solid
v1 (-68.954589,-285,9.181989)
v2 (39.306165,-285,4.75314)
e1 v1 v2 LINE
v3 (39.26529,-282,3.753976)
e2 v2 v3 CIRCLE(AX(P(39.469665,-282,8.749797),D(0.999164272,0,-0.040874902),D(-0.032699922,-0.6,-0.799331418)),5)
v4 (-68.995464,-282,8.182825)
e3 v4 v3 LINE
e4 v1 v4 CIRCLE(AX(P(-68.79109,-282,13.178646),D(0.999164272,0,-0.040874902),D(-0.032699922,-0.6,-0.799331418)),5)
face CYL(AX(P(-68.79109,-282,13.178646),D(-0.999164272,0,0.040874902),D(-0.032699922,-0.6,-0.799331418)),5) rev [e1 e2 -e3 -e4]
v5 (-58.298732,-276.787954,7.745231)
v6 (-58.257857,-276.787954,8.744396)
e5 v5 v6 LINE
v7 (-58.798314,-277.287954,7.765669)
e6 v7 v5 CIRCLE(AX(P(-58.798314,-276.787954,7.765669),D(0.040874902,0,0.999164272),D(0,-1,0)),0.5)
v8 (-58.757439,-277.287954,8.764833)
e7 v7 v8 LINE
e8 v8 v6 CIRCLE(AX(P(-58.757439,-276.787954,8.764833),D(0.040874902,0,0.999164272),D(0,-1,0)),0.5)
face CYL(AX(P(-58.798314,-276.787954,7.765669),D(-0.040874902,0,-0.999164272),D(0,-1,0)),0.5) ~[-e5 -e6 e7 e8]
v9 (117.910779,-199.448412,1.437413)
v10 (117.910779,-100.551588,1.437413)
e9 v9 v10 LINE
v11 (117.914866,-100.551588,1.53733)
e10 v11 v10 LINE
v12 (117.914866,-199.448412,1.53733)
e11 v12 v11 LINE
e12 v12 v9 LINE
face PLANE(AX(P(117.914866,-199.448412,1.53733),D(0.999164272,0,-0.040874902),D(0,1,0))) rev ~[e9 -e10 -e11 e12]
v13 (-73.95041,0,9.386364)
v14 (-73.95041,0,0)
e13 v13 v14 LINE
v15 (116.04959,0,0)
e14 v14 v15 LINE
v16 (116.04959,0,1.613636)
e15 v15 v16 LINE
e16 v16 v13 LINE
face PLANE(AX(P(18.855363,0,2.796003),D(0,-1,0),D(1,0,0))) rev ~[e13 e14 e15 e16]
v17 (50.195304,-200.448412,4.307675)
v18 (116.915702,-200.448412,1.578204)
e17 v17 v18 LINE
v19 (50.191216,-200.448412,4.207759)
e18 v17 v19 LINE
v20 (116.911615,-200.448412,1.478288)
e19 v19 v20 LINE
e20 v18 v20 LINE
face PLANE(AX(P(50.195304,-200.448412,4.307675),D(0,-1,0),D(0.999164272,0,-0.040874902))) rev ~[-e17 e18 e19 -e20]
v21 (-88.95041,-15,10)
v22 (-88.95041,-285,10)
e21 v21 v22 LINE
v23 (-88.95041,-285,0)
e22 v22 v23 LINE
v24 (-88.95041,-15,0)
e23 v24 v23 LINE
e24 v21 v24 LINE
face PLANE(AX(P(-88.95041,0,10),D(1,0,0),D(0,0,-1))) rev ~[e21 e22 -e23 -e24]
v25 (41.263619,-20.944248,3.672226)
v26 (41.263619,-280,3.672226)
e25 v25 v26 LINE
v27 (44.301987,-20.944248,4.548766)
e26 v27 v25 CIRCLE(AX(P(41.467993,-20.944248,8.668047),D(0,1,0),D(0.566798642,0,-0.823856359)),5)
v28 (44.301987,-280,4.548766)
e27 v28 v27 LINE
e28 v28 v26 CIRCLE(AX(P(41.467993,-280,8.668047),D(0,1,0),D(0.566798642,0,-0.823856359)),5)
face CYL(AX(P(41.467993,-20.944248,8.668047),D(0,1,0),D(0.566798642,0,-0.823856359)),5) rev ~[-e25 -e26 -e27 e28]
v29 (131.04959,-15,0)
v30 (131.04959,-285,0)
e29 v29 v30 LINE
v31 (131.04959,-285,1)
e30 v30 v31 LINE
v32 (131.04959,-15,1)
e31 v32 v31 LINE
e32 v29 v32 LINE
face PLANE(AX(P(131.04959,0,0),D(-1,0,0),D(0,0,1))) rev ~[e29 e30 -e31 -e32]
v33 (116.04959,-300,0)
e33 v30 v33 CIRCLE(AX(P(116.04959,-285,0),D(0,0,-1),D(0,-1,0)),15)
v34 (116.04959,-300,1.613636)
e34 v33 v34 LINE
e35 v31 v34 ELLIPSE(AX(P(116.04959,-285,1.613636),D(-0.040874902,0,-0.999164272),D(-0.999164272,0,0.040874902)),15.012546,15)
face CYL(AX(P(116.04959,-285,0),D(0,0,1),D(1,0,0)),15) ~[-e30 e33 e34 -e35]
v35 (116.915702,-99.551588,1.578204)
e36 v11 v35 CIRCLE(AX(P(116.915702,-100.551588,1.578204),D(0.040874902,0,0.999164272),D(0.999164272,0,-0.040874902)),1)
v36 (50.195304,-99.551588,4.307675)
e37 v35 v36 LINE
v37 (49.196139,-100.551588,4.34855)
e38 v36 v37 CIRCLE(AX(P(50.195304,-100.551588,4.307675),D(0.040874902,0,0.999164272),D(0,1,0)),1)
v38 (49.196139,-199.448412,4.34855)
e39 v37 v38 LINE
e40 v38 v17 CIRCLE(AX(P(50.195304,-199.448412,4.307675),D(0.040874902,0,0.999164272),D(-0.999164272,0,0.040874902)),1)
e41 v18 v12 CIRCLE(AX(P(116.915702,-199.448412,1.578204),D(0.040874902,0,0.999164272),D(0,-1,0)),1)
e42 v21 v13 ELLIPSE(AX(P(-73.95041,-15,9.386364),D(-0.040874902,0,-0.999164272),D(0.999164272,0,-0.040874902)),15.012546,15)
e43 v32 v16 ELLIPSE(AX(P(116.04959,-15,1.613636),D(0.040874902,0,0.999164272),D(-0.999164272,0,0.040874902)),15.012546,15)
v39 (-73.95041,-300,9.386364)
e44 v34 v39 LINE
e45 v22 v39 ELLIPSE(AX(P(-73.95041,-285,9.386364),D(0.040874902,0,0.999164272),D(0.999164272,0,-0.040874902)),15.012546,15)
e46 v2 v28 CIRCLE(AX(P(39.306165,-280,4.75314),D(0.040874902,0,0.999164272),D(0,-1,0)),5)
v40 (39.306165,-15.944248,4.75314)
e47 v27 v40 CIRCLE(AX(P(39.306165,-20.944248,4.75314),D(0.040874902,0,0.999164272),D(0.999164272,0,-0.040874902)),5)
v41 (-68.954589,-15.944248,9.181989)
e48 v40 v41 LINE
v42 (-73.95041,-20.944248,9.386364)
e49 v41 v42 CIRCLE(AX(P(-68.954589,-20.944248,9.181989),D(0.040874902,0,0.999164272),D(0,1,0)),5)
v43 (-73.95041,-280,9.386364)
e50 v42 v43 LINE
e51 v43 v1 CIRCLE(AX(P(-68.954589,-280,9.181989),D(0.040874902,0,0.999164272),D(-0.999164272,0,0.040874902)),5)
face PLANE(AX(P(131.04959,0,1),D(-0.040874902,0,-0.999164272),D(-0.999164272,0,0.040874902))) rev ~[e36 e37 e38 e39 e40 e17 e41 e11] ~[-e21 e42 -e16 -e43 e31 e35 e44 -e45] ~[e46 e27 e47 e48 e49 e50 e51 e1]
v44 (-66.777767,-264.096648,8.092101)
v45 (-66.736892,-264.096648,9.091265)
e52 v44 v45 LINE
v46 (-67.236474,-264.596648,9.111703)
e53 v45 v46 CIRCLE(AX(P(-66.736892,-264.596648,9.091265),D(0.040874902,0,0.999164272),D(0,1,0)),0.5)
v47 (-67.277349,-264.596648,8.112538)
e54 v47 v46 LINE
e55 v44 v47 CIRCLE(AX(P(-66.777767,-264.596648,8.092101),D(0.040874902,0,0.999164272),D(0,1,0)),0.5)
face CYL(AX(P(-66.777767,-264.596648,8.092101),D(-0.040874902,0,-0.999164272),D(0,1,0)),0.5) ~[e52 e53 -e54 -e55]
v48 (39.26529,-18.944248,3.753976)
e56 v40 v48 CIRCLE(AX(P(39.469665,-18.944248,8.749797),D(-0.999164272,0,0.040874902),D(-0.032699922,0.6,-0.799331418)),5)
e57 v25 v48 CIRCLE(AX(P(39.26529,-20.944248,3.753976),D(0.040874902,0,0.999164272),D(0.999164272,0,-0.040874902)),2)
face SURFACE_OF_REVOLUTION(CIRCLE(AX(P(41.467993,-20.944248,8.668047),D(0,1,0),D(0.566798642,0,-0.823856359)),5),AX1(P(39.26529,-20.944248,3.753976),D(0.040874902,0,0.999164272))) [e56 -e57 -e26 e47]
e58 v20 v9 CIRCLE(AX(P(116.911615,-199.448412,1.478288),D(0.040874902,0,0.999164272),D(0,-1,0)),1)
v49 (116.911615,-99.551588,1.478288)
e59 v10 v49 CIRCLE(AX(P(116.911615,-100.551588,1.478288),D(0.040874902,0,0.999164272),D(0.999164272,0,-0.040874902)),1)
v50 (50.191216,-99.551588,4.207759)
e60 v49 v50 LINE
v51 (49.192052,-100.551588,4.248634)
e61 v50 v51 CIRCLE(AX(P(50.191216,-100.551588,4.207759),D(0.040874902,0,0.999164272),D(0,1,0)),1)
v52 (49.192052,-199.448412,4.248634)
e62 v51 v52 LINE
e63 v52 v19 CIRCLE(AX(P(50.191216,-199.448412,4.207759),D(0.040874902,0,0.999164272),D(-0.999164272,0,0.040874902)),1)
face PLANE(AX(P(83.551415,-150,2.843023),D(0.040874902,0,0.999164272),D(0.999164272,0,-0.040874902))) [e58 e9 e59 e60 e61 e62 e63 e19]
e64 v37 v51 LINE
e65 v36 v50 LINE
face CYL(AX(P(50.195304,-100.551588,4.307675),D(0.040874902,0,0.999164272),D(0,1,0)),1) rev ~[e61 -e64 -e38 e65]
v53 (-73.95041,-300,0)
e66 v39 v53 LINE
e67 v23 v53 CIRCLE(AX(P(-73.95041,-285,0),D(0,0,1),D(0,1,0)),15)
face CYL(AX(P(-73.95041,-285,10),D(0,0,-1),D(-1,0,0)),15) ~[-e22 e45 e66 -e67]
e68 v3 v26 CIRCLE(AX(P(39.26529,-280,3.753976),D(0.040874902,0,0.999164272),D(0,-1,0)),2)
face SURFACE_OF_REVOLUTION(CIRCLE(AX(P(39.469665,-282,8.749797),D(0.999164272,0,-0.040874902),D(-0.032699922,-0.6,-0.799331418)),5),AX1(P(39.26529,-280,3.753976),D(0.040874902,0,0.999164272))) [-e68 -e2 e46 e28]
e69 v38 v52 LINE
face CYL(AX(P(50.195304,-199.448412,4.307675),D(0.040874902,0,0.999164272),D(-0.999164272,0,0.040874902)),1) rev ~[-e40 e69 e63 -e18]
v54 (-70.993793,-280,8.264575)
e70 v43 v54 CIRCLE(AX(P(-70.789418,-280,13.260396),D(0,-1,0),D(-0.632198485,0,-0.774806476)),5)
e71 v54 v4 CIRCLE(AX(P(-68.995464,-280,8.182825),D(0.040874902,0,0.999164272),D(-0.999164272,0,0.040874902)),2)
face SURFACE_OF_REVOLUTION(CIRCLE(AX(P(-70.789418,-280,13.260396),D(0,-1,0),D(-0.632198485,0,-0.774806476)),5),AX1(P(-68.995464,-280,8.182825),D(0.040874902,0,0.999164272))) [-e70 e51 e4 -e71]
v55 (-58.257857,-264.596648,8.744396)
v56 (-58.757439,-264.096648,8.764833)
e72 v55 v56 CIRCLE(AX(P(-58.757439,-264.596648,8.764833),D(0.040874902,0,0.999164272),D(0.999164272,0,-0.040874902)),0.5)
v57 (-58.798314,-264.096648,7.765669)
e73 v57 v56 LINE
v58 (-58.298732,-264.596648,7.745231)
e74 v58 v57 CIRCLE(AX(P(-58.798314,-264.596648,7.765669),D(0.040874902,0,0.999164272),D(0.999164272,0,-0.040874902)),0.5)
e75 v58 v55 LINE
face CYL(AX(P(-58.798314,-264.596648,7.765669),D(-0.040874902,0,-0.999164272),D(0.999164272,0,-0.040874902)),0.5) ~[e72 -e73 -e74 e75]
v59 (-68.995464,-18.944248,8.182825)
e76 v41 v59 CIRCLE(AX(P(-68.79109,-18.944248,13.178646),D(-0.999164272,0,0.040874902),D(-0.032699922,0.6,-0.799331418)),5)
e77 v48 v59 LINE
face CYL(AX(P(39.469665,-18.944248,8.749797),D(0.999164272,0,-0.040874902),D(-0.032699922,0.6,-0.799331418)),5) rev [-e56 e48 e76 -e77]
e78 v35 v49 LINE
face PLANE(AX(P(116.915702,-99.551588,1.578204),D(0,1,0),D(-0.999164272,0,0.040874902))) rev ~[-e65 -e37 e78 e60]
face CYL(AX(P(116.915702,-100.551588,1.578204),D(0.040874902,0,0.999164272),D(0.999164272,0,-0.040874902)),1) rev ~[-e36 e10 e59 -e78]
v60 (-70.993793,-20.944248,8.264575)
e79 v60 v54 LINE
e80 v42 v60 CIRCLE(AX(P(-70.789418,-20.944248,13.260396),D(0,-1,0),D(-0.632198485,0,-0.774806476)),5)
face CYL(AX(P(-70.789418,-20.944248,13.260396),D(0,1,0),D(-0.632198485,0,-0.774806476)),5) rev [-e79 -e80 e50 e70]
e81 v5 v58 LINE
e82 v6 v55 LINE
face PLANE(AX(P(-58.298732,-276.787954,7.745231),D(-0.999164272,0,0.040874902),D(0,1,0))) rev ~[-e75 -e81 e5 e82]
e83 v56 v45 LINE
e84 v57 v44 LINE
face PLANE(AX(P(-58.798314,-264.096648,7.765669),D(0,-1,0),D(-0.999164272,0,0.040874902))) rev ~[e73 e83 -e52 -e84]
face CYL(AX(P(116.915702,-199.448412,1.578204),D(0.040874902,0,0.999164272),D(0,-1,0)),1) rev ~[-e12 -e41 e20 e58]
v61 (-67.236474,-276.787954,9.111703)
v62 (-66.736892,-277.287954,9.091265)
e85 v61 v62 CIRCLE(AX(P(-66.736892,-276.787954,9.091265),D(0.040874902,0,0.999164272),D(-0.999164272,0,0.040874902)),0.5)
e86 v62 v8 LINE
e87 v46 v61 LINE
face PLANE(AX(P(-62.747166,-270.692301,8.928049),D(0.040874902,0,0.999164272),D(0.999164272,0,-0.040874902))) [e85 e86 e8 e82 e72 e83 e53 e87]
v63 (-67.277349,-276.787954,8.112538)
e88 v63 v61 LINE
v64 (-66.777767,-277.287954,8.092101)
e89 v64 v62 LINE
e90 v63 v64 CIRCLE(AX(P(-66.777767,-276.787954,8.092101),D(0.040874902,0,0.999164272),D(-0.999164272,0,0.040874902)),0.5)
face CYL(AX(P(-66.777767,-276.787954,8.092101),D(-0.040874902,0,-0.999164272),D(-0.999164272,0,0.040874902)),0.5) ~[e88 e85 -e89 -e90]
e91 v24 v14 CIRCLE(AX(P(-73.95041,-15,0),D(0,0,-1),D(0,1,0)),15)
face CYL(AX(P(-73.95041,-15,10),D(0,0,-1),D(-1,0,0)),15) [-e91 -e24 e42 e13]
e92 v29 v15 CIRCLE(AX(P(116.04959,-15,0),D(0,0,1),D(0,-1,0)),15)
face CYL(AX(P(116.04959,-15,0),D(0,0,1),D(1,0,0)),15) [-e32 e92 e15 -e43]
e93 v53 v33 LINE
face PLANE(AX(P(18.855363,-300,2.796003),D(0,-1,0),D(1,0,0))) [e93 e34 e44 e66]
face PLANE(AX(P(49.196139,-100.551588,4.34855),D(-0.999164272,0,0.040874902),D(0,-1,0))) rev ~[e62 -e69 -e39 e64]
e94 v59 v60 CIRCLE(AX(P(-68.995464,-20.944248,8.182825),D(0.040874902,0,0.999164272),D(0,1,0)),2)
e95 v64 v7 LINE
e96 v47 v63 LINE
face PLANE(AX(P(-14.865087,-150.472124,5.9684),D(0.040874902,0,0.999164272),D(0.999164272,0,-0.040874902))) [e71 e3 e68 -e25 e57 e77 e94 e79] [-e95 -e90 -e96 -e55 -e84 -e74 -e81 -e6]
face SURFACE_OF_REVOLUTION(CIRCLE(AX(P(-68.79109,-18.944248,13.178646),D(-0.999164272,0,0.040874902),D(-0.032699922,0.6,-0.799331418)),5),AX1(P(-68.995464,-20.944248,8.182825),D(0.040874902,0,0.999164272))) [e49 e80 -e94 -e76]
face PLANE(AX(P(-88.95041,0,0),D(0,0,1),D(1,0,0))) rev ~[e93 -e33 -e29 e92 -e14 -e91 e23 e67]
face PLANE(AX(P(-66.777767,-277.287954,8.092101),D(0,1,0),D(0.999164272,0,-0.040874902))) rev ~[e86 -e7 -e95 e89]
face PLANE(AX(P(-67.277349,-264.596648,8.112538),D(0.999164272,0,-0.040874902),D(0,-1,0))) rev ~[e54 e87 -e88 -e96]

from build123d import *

# Parameters (mm, degrees)
F1_DEPTH     = 300
F2_R         = 15
F4_DEPTH     = 1
F5_T1_DEPTH  = 108.3513065438
F5_T3_DEPTH  = 259.0557519346
F5_T5_DEPTH  = 108.3513065438
F5_T8_ANGLE  = 90
F5_T10_ANGLE = 90
F5_T12_ANGLE = 90
F5_T14_ANGLE = 90
F7_DEPTH     = 0.1
F9_DEPTH     = 1


# Not quite as in the source:
# - a fillet or chamfer that OpenCascade refuses, or shapes differently, is made with other operations: its cross-section is extruded or revolved along the edge and cut away or added


with BuildPart() as f1:
    # F0 (on Front) → F1 (new body)
    with BuildSketch(Plane.XZ):
        Polygon((-88.9504104853, 0), (131.0495895147, 0), (131.0495895147, 1), (-88.9504104853, 10), align=None)
    extrude(amount=F1_DEPTH)

    # F2
    f2_edges = [f1.edges().sort_by_distance(p)[0] for p in [
        (-88.95041, -300, 5),
        (131.04959, -300, 0.5),
        (131.04959, 0, 0.5),
        (-88.95041, 0, 5),
    ]]
    fillet(f2_edges, radius=F2_R)

    # F3 (on face) → F4 (cut)
    with BuildSketch(Plane(origin=(0.2597928415, 0, 6.3504916821), x_dir=(0.999164272, 0, -0.040874902), z_dir=(0.040874902, 0, 0.999164272))):
        with BuildLine():
            ThreePointArc((-74.2722747486, -280), (-72.8078086545, -283.5355339059), (-69.2722747486, -285))
            Line((-69.2722747486, -285), (39.0790317953, -285))
            ThreePointArc((39.0790317953, -285), (42.6145657012, -283.5355339059), (44.0790317953, -280))
            Line((44.0790317953, -280), (44.0790317953, -20.9442480654))
            ThreePointArc((44.0790317953, -20.9442480654), (42.6145657012, -17.4087141594), (39.0790317953, -15.9442480654))
            Line((39.0790317953, -15.9442480654), (-69.2722747486, -15.9442480654))
            ThreePointArc((-69.2722747486, -15.9442480654), (-72.8078086545, -17.4087141594), (-74.2722747486, -20.9442480654))
            Line((-74.2722747486, -20.9442480654), (-74.2722747486, -280))
        make_face()
    extrude(amount=-F4_DEPTH, mode=Mode.SUBTRACT)

    # F5: fillet of radius 5 on 8 edges, made by hand

    # F5_s2 → F5_t1 (join)
    with BuildSketch(Plane(origin=(-69.214381967, 0, 2.8314974441), x_dir=(0, 1, 0), z_dir=(0.999164272, 0, -0.040874902))):
        with BuildLine():
            ThreePointArc((-285, 6.3558034051), (-283.5811388301, 5.6123869149), (-282, 5.3558034051))
            Line((-282, 5.3558034051), (-285, 5.3558034051))
            Line((-285, 5.3558034051), (-285, 6.3558034051))
        make_face()
    extrude(amount=F5_T1_DEPTH)

    # F5_s4 → F5_t3 (join)
    with BuildSketch(Plane.XZ.offset(20.9442480654)):
        with BuildLine():
            ThreePointArc((44.3019865544, 4.5487655756), (42.8539240904, 3.8639661907), (41.2636188365, 3.6722260098))
            Line((41.2636188365, 3.6722260098), (44.2611116524, 3.5496013037))
            Line((44.2611116524, 3.5496013037), (44.3019865544, 4.5487655756))
        make_face()
        with BuildLine():
            ThreePointArc((-73.9504104853, 9.3863636364), (-72.5631221736, 8.5855726288), (-70.9937925714, 8.2645746583))
            Line((-70.9937925714, 8.2645746583), (-73.9912853873, 8.3871993644))
            Line((-73.9912853873, 8.3871993644), (-73.9504104853, 9.3863636364))
        make_face()
    extrude(amount=F5_T3_DEPTH)

    # F5_s6 → F5_t5 (join)
    with BuildSketch(Plane(origin=(39.0463723531, 0, -1.5973515963), x_dir=(0, 1, 0), z_dir=(-0.999164272, 0, 0.040874902))):
        with BuildLine():
            ThreePointArc((-15.9442480654, -6.3558034051), (-17.3631092353, -5.6123869149), (-18.9442480654, -5.3558034051))
            Line((-18.9442480654, -5.3558034051), (-15.9442480654, -5.3558034051))
            Line((-15.9442480654, -5.3558034051), (-15.9442480654, -6.3558034051))
        make_face()
    extrude(amount=F5_T5_DEPTH)

    # F5_s7 → F5_t8 (revolve)
    with BuildSketch(Plane.XZ.offset(280)):
        with BuildLine():
            ThreePointArc((-73.9504104853, 9.3863636364), (-72.5631221736, 8.5855726288), (-70.9937925714, 8.2645746583))
            Line((-70.9937925714, 8.2645746583), (-73.9912853873, 8.3871993644))
            Line((-73.9912853873, 8.3871993644), (-73.9504104853, 9.3863636364))
        make_face()
    revolve(axis=Axis((-68.9954640274, -280, 8.1828248542), (0.040874902, 0, 0.999164272)), revolution_arc=F5_T8_ANGLE)

    # F5_s9 → F5_t10 (revolve)
    with BuildSketch(Plane(origin=(39.046372353, 0, -1.5973515963), x_dir=(0, 1, 0), z_dir=(-0.999164272, 0, 0.040874902))):
        with BuildLine():
            ThreePointArc((-285, -6.3558034051), (-283.5811388301, -5.6123869149), (-282, -5.3558034051))
            Line((-282, -5.3558034051), (-285, -5.3558034051))
            Line((-285, -5.3558034051), (-285, -6.3558034051))
        make_face()
    revolve(axis=Axis((39.2652902926, -280, 3.7539758139), (0.040874902, 0, 0.999164272)), revolution_arc=F5_T10_ANGLE)

    # F5_s11 → F5_t12 (revolve)
    with BuildSketch(Plane.XZ.offset(20.9442480654)):
        with BuildLine():
            ThreePointArc((44.3019865544, 4.5487655756), (42.8539240904, 3.8639661907), (41.2636188365, 3.6722260098))
            Line((41.2636188365, 3.6722260098), (44.2611116524, 3.5496013037))
            Line((44.2611116524, 3.5496013037), (44.3019865544, 4.5487655756))
        make_face()
    revolve(axis=Axis((39.2652902926, -20.9442480654, 3.7539758139), (0.040874902, 0, 0.999164272)), revolution_arc=F5_T12_ANGLE)

    # F5_s13 → F5_t14 (revolve)
    with BuildSketch(Plane(origin=(-69.214381967, 0, 2.8314974441), x_dir=(0, 1, 0), z_dir=(0.999164272, 0, -0.040874902))):
        with BuildLine():
            ThreePointArc((-15.9442480654, 6.3558034051), (-17.3631092353, 5.6123869149), (-18.9442480654, 5.3558034051))
            Line((-18.9442480654, 5.3558034051), (-15.9442480654, 5.3558034051))
            Line((-15.9442480654, 5.3558034051), (-15.9442480654, 6.3558034051))
        make_face()
    revolve(axis=Axis((-68.9954640274, -20.9442480654, 8.1828248542), (0.040874902, 0, 0.999164272)), revolution_arc=F5_T14_ANGLE)

    # F6 (on face) → F7 (cut)
    with BuildSketch(Plane(origin=(0.2597928415, 0, 6.3504916821), x_dir=(0.999164272, 0, -0.040874902), z_dir=(0.040874902, 0, 0.999164272))):
        with BuildLine():
            ThreePointArc((117.753483355, -100.5515882969), (117.4605901362, -99.8444815157), (116.753483355, -99.5515882969))
            Line((116.753483355, -99.5515882969), (49.977278173, -99.5515882969))
            ThreePointArc((49.977278173, -99.5515882969), (49.2701713918, -99.8444815157), (48.977278173, -100.5515882969))
            Line((48.977278173, -100.5515882969), (48.977278173, -199.4484117031))
            ThreePointArc((48.977278173, -199.4484117031), (49.2701713918, -200.1555184843), (49.977278173, -200.4484117031))
            Line((49.977278173, -200.4484117031), (116.753483355, -200.4484117031))
            ThreePointArc((116.753483355, -200.4484117031), (117.4605901362, -200.1555184843), (117.753483355, -199.4484117031))
            Line((117.753483355, -199.4484117031), (117.753483355, -100.5515882969))
        make_face()
    extrude(amount=-F7_DEPTH, mode=Mode.SUBTRACT)

    # F8 (on face) → F9 (join)
    with BuildSketch(Plane(origin=(0.2189179395, 0, 5.3513274101), x_dir=(0.999164272, 0, -0.040874902), z_dir=(0.040874902, 0, 0.999164272))):
        with BuildLine():
            ThreePointArc((-67.5527229905, -276.7879536152), (-67.4062763811, -277.1415070058), (-67.0527229905, -277.2879536152))
            Line((-67.0527229905, -277.2879536152), (-59.0665953457, -277.2879536152))
            ThreePointArc((-59.0665953457, -277.2879536152), (-58.7130419551, -277.1415070058), (-58.5665953457, -276.7879536152))
            Line((-58.5665953457, -276.7879536152), (-58.5665953457, -264.596647501))
            ThreePointArc((-58.5665953457, -264.596647501), (-58.7130419551, -264.2430941104), (-59.0665953457, -264.096647501))
            Line((-59.0665953457, -264.096647501), (-67.0527229905, -264.096647501))
            ThreePointArc((-67.0527229905, -264.096647501), (-67.4062763811, -264.2430941104), (-67.5527229905, -264.596647501))
            Line((-67.5527229905, -264.596647501), (-67.5527229905, -276.7879536152))
        make_face()
    extrude(amount=F9_DEPTH)


solid = f1.part
